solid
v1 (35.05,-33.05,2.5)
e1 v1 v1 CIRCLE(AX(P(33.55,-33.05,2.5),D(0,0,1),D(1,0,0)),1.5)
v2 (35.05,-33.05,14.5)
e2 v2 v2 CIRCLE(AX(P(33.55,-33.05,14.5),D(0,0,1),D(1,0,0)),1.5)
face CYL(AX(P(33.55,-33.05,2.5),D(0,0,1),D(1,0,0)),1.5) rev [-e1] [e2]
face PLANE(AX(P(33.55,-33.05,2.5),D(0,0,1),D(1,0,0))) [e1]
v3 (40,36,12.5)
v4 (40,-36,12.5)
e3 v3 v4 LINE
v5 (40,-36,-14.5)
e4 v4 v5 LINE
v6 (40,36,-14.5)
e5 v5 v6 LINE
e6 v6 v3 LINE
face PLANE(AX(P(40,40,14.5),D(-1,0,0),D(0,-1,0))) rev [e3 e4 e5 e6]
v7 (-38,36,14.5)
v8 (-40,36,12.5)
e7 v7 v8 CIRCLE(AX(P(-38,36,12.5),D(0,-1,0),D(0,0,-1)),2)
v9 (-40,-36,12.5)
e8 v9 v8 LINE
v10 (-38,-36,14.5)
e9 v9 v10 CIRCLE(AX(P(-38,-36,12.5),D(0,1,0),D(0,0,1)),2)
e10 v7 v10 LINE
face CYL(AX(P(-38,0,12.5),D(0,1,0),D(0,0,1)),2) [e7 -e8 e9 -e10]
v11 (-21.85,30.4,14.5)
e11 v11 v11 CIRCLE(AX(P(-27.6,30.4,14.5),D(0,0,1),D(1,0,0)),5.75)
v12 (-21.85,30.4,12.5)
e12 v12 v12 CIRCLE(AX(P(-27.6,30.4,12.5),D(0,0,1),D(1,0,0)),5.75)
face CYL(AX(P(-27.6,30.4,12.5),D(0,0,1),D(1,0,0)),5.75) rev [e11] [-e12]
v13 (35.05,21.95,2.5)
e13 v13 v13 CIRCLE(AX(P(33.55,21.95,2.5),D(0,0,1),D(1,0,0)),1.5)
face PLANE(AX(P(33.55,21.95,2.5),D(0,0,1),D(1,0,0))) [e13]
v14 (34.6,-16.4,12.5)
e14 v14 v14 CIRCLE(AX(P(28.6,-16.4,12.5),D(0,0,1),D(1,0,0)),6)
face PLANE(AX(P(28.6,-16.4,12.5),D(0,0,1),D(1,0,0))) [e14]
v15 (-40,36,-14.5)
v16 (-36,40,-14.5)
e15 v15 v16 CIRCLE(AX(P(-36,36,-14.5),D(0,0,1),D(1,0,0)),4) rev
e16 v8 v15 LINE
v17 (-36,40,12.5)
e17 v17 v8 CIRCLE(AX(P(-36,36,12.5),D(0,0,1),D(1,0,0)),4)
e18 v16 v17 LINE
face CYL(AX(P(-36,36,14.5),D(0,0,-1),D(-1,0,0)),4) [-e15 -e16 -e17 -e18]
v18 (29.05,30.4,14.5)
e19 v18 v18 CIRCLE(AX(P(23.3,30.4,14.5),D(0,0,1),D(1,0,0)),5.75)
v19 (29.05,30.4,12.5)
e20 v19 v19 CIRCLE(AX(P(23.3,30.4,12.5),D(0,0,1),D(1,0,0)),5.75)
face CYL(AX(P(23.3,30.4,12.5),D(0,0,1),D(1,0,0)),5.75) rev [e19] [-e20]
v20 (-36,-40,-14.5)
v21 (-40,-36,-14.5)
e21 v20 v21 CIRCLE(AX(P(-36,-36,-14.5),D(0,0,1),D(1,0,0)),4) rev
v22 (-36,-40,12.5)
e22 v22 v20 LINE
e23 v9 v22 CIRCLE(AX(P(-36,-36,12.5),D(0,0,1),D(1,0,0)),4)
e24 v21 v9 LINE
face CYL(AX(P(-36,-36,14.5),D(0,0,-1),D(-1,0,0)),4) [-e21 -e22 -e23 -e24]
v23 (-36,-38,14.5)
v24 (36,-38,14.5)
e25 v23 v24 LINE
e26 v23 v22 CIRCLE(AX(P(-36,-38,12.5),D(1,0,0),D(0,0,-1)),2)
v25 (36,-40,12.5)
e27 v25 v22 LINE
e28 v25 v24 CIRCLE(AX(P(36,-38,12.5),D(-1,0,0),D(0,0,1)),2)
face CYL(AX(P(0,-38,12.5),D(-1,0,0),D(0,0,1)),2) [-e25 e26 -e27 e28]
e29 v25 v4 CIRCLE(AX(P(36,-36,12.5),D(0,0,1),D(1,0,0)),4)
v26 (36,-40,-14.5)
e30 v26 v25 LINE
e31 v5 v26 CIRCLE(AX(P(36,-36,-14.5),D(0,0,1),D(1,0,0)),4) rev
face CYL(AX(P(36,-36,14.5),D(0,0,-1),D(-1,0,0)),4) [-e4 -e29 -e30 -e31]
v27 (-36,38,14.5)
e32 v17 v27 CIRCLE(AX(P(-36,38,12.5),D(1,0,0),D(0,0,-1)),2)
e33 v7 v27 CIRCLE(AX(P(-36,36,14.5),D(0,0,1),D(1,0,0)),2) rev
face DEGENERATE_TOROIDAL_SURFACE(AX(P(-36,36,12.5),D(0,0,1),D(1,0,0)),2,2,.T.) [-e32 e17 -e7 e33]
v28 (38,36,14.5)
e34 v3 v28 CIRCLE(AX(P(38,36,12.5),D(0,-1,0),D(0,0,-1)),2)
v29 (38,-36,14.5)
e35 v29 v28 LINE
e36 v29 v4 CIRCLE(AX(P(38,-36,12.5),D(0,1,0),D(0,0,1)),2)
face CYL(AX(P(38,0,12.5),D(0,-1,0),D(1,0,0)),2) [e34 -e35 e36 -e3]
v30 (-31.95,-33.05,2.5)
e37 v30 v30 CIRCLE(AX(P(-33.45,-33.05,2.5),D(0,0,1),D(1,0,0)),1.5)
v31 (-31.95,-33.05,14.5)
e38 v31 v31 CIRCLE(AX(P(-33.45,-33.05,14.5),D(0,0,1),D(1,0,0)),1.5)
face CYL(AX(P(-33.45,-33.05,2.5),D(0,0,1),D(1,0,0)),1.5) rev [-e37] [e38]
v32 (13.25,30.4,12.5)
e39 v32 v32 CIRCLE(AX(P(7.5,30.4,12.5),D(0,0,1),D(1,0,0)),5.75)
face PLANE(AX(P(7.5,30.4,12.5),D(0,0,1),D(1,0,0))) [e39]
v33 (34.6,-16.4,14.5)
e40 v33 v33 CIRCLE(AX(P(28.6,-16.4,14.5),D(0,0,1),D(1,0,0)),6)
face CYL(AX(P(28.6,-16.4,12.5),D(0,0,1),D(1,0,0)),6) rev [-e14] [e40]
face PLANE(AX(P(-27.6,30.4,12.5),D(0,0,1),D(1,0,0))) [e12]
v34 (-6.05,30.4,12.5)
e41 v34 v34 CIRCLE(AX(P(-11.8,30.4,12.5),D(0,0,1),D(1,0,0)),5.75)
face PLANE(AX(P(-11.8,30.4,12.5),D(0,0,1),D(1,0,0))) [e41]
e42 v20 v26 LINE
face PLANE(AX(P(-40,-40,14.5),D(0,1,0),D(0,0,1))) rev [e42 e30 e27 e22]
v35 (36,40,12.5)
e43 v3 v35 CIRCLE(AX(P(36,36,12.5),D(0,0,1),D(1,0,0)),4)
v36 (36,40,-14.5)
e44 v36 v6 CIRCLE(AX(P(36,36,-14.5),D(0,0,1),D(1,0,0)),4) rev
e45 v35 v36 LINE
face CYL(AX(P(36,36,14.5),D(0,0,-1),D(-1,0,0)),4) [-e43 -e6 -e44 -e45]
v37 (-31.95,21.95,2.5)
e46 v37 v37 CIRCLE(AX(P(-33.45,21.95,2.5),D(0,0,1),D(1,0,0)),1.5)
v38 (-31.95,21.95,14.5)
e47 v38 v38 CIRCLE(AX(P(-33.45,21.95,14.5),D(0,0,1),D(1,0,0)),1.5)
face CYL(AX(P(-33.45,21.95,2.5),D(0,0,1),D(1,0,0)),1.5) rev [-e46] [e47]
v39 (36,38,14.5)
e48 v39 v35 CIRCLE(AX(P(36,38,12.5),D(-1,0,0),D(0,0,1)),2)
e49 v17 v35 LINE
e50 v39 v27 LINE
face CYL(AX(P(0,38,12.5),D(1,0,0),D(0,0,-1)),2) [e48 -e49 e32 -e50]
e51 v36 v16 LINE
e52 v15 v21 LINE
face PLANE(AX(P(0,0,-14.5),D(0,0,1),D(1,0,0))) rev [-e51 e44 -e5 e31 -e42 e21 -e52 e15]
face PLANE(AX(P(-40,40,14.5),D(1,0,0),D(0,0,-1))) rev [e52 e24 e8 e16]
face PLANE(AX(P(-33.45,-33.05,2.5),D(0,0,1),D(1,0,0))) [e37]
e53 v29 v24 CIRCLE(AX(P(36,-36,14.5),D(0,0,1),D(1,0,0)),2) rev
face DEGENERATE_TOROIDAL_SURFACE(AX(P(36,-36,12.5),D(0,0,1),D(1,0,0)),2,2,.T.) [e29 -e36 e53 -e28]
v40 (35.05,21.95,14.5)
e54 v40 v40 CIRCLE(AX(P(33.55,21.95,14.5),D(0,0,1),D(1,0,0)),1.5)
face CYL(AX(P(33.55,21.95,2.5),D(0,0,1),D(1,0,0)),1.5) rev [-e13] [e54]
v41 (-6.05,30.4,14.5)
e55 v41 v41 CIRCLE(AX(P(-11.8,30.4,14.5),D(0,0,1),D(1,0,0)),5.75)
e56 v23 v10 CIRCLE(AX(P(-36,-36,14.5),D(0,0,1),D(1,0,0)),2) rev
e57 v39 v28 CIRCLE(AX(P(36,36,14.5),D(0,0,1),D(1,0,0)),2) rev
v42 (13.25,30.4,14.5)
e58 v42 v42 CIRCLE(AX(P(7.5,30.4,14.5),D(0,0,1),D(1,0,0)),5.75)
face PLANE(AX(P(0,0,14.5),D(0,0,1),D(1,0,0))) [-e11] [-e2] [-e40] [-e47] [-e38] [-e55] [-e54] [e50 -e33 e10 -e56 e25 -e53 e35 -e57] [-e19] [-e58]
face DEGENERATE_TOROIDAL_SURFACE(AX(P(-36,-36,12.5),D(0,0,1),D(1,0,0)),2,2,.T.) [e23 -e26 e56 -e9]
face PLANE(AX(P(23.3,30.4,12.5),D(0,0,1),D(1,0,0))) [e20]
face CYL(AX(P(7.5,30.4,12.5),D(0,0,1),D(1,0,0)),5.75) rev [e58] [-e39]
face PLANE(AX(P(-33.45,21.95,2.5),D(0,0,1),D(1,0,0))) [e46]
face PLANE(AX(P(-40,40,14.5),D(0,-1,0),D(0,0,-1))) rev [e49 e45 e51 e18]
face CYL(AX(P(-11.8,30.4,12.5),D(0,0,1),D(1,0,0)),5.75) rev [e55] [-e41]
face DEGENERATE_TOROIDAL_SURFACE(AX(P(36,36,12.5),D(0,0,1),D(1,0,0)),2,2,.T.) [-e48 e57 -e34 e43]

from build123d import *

# Parameters (mm, degrees)
SKETCH1_W           = 80
SKETCH1_H           = 80
BOSS_EXTRUDE1_DEPTH = 14.5
FILLET1_R           = 2
FILLET2_R           = 4
SKETCH2_R           = 5.75
CUT_EXTRUDE1_DEPTH  = 2
SKETCH3_R           = 1.5
CUT_EXTRUDE2_DEPTH  = 12
SKETCH6_R           = 6
CUT_EXTRUDE3_DEPTH  = 2


with BuildPart() as part:
    # Sketch1 → Boss-Extrude1 (new, symmetric)
    with BuildSketch(Plane.XY):
        Rectangle(SKETCH1_W, SKETCH1_H)
    extrude(amount=BOSS_EXTRUDE1_DEPTH, both=True)

    # Fillet1
    fillet1_edges = [part.edges().sort_by_distance(p)[0] for p in [
        (-40, 0, 14.5),
        (0, -40, 14.5),
        (40, 0, 14.5),
        (0, 40, 14.5),
    ]]
    fillet(fillet1_edges, radius=FILLET1_R)

    # Fillet2
    # the kernel refuses this fillet: 4 mm, written as the material it takes off along each edge
    with BuildSketch(Plane(origin=(-36, -36, 14.5), x_dir=(-1, 0, 0), z_dir=(0, 1, 0))) as fillet2_piece_1:
        with BuildLine():
            CenterArc((2, -2), 2, 0, 90)
            Line((4, -2), (4, 0))
            Line((4, 0), (2, 0))
        make_face()
    revolve(axis=Axis((-36, -36, 14.5), (0, 0, 1)), revolution_arc=90, mode=Mode.SUBTRACT)
    with BuildSketch(Plane(origin=(-36, 36, 14.5), x_dir=(0, 1, 0), z_dir=(1, 0, 0))) as fillet2_piece_2:
        with BuildLine():
            CenterArc((2, -2), 2, 0, 90)
            Line((4, -2), (4, 0))
            Line((4, 0), (2, 0))
        make_face()
    revolve(axis=Axis((-36, 36, 14.5), (0, 0, 1)), revolution_arc=90, mode=Mode.SUBTRACT)
    with BuildSketch(Plane(origin=(36, -36, 14.5), x_dir=(0, -1, 0), z_dir=(-1, 0, 0))) as fillet2_piece_3:
        with BuildLine():
            CenterArc((2, -2), 2, 0, 90)
            Line((4, -2), (4, 0))
            Line((4, 0), (2, 0))
        make_face()
    revolve(axis=Axis((36, -36, 14.5), (0, 0, 1)), revolution_arc=90, mode=Mode.SUBTRACT)
    with BuildSketch(Plane(origin=(36, 36, 14.5), x_dir=(1, 0, 0), z_dir=(0, -1, 0))) as fillet2_piece_4:
        with BuildLine():
            CenterArc((2, -2), 2, 0, 90)
            Line((4, -2), (4, 0))
            Line((4, 0), (2, 0))
        make_face()
    revolve(axis=Axis((36, 36, 14.5), (0, 0, 1)), revolution_arc=90, mode=Mode.SUBTRACT)
    with BuildSketch(Plane(origin=(40, 40, 14.5), x_dir=(-1, 0, 0), z_dir=(0, 0, -1)), Plane(origin=(40, -40, 14.5), x_dir=(0, 1, 0), z_dir=(0, 0, -1)), Plane(origin=(-40, -40, -24.5), x_dir=(0, 1, 0), z_dir=(0, 0, 1)), Plane(origin=(-40, 40, -24.5), x_dir=(1, 0, 0), z_dir=(0, 0, 1))) as fillet2_piece_5:
        with BuildLine():
            CenterArc((FILLET2_R, -FILLET2_R), FILLET2_R, 90, 90)
            Line((0, -FILLET2_R), (0, 0))
            Line((0, 0), (FILLET2_R, 0))
        make_face()
    extrude(amount=39, mode=Mode.SUBTRACT)

    # Sketch2 → Cut-Extrude1 (cut)
    with BuildSketch(Plane.XY.offset(14.5)):
        with Locations((-27.6, 30.4)):
            Circle(SKETCH2_R)
        with Locations((-11.8, 30.4)):
            Circle(SKETCH2_R)
        with Locations((7.5, 30.4)):
            Circle(SKETCH2_R)
        with Locations((23.3, 30.4)):
            Circle(SKETCH2_R)
    extrude(amount=-CUT_EXTRUDE1_DEPTH, mode=Mode.SUBTRACT)

    # Sketch3 → Cut-Extrude2 (cut)
    with BuildSketch(Plane.XY.offset(14.5)):
        with Locations((-33.45, 21.95)):
            Circle(SKETCH3_R)
        with Locations((33.55, 21.95)):
            Circle(SKETCH3_R)
        with Locations((-33.45, -33.05)):
            Circle(SKETCH3_R)
        with Locations((33.55, -33.05)):
            Circle(SKETCH3_R)
    extrude(amount=-CUT_EXTRUDE2_DEPTH, mode=Mode.SUBTRACT)

    # Sketch6 → Cut-Extrude3 (cut)
    with BuildSketch(Plane.XY.offset(14.5)):
        with Locations((28.6, -16.4)):
            Circle(SKETCH6_R)
    extrude(amount=-CUT_EXTRUDE3_DEPTH, mode=Mode.SUBTRACT)


solid = part.part
